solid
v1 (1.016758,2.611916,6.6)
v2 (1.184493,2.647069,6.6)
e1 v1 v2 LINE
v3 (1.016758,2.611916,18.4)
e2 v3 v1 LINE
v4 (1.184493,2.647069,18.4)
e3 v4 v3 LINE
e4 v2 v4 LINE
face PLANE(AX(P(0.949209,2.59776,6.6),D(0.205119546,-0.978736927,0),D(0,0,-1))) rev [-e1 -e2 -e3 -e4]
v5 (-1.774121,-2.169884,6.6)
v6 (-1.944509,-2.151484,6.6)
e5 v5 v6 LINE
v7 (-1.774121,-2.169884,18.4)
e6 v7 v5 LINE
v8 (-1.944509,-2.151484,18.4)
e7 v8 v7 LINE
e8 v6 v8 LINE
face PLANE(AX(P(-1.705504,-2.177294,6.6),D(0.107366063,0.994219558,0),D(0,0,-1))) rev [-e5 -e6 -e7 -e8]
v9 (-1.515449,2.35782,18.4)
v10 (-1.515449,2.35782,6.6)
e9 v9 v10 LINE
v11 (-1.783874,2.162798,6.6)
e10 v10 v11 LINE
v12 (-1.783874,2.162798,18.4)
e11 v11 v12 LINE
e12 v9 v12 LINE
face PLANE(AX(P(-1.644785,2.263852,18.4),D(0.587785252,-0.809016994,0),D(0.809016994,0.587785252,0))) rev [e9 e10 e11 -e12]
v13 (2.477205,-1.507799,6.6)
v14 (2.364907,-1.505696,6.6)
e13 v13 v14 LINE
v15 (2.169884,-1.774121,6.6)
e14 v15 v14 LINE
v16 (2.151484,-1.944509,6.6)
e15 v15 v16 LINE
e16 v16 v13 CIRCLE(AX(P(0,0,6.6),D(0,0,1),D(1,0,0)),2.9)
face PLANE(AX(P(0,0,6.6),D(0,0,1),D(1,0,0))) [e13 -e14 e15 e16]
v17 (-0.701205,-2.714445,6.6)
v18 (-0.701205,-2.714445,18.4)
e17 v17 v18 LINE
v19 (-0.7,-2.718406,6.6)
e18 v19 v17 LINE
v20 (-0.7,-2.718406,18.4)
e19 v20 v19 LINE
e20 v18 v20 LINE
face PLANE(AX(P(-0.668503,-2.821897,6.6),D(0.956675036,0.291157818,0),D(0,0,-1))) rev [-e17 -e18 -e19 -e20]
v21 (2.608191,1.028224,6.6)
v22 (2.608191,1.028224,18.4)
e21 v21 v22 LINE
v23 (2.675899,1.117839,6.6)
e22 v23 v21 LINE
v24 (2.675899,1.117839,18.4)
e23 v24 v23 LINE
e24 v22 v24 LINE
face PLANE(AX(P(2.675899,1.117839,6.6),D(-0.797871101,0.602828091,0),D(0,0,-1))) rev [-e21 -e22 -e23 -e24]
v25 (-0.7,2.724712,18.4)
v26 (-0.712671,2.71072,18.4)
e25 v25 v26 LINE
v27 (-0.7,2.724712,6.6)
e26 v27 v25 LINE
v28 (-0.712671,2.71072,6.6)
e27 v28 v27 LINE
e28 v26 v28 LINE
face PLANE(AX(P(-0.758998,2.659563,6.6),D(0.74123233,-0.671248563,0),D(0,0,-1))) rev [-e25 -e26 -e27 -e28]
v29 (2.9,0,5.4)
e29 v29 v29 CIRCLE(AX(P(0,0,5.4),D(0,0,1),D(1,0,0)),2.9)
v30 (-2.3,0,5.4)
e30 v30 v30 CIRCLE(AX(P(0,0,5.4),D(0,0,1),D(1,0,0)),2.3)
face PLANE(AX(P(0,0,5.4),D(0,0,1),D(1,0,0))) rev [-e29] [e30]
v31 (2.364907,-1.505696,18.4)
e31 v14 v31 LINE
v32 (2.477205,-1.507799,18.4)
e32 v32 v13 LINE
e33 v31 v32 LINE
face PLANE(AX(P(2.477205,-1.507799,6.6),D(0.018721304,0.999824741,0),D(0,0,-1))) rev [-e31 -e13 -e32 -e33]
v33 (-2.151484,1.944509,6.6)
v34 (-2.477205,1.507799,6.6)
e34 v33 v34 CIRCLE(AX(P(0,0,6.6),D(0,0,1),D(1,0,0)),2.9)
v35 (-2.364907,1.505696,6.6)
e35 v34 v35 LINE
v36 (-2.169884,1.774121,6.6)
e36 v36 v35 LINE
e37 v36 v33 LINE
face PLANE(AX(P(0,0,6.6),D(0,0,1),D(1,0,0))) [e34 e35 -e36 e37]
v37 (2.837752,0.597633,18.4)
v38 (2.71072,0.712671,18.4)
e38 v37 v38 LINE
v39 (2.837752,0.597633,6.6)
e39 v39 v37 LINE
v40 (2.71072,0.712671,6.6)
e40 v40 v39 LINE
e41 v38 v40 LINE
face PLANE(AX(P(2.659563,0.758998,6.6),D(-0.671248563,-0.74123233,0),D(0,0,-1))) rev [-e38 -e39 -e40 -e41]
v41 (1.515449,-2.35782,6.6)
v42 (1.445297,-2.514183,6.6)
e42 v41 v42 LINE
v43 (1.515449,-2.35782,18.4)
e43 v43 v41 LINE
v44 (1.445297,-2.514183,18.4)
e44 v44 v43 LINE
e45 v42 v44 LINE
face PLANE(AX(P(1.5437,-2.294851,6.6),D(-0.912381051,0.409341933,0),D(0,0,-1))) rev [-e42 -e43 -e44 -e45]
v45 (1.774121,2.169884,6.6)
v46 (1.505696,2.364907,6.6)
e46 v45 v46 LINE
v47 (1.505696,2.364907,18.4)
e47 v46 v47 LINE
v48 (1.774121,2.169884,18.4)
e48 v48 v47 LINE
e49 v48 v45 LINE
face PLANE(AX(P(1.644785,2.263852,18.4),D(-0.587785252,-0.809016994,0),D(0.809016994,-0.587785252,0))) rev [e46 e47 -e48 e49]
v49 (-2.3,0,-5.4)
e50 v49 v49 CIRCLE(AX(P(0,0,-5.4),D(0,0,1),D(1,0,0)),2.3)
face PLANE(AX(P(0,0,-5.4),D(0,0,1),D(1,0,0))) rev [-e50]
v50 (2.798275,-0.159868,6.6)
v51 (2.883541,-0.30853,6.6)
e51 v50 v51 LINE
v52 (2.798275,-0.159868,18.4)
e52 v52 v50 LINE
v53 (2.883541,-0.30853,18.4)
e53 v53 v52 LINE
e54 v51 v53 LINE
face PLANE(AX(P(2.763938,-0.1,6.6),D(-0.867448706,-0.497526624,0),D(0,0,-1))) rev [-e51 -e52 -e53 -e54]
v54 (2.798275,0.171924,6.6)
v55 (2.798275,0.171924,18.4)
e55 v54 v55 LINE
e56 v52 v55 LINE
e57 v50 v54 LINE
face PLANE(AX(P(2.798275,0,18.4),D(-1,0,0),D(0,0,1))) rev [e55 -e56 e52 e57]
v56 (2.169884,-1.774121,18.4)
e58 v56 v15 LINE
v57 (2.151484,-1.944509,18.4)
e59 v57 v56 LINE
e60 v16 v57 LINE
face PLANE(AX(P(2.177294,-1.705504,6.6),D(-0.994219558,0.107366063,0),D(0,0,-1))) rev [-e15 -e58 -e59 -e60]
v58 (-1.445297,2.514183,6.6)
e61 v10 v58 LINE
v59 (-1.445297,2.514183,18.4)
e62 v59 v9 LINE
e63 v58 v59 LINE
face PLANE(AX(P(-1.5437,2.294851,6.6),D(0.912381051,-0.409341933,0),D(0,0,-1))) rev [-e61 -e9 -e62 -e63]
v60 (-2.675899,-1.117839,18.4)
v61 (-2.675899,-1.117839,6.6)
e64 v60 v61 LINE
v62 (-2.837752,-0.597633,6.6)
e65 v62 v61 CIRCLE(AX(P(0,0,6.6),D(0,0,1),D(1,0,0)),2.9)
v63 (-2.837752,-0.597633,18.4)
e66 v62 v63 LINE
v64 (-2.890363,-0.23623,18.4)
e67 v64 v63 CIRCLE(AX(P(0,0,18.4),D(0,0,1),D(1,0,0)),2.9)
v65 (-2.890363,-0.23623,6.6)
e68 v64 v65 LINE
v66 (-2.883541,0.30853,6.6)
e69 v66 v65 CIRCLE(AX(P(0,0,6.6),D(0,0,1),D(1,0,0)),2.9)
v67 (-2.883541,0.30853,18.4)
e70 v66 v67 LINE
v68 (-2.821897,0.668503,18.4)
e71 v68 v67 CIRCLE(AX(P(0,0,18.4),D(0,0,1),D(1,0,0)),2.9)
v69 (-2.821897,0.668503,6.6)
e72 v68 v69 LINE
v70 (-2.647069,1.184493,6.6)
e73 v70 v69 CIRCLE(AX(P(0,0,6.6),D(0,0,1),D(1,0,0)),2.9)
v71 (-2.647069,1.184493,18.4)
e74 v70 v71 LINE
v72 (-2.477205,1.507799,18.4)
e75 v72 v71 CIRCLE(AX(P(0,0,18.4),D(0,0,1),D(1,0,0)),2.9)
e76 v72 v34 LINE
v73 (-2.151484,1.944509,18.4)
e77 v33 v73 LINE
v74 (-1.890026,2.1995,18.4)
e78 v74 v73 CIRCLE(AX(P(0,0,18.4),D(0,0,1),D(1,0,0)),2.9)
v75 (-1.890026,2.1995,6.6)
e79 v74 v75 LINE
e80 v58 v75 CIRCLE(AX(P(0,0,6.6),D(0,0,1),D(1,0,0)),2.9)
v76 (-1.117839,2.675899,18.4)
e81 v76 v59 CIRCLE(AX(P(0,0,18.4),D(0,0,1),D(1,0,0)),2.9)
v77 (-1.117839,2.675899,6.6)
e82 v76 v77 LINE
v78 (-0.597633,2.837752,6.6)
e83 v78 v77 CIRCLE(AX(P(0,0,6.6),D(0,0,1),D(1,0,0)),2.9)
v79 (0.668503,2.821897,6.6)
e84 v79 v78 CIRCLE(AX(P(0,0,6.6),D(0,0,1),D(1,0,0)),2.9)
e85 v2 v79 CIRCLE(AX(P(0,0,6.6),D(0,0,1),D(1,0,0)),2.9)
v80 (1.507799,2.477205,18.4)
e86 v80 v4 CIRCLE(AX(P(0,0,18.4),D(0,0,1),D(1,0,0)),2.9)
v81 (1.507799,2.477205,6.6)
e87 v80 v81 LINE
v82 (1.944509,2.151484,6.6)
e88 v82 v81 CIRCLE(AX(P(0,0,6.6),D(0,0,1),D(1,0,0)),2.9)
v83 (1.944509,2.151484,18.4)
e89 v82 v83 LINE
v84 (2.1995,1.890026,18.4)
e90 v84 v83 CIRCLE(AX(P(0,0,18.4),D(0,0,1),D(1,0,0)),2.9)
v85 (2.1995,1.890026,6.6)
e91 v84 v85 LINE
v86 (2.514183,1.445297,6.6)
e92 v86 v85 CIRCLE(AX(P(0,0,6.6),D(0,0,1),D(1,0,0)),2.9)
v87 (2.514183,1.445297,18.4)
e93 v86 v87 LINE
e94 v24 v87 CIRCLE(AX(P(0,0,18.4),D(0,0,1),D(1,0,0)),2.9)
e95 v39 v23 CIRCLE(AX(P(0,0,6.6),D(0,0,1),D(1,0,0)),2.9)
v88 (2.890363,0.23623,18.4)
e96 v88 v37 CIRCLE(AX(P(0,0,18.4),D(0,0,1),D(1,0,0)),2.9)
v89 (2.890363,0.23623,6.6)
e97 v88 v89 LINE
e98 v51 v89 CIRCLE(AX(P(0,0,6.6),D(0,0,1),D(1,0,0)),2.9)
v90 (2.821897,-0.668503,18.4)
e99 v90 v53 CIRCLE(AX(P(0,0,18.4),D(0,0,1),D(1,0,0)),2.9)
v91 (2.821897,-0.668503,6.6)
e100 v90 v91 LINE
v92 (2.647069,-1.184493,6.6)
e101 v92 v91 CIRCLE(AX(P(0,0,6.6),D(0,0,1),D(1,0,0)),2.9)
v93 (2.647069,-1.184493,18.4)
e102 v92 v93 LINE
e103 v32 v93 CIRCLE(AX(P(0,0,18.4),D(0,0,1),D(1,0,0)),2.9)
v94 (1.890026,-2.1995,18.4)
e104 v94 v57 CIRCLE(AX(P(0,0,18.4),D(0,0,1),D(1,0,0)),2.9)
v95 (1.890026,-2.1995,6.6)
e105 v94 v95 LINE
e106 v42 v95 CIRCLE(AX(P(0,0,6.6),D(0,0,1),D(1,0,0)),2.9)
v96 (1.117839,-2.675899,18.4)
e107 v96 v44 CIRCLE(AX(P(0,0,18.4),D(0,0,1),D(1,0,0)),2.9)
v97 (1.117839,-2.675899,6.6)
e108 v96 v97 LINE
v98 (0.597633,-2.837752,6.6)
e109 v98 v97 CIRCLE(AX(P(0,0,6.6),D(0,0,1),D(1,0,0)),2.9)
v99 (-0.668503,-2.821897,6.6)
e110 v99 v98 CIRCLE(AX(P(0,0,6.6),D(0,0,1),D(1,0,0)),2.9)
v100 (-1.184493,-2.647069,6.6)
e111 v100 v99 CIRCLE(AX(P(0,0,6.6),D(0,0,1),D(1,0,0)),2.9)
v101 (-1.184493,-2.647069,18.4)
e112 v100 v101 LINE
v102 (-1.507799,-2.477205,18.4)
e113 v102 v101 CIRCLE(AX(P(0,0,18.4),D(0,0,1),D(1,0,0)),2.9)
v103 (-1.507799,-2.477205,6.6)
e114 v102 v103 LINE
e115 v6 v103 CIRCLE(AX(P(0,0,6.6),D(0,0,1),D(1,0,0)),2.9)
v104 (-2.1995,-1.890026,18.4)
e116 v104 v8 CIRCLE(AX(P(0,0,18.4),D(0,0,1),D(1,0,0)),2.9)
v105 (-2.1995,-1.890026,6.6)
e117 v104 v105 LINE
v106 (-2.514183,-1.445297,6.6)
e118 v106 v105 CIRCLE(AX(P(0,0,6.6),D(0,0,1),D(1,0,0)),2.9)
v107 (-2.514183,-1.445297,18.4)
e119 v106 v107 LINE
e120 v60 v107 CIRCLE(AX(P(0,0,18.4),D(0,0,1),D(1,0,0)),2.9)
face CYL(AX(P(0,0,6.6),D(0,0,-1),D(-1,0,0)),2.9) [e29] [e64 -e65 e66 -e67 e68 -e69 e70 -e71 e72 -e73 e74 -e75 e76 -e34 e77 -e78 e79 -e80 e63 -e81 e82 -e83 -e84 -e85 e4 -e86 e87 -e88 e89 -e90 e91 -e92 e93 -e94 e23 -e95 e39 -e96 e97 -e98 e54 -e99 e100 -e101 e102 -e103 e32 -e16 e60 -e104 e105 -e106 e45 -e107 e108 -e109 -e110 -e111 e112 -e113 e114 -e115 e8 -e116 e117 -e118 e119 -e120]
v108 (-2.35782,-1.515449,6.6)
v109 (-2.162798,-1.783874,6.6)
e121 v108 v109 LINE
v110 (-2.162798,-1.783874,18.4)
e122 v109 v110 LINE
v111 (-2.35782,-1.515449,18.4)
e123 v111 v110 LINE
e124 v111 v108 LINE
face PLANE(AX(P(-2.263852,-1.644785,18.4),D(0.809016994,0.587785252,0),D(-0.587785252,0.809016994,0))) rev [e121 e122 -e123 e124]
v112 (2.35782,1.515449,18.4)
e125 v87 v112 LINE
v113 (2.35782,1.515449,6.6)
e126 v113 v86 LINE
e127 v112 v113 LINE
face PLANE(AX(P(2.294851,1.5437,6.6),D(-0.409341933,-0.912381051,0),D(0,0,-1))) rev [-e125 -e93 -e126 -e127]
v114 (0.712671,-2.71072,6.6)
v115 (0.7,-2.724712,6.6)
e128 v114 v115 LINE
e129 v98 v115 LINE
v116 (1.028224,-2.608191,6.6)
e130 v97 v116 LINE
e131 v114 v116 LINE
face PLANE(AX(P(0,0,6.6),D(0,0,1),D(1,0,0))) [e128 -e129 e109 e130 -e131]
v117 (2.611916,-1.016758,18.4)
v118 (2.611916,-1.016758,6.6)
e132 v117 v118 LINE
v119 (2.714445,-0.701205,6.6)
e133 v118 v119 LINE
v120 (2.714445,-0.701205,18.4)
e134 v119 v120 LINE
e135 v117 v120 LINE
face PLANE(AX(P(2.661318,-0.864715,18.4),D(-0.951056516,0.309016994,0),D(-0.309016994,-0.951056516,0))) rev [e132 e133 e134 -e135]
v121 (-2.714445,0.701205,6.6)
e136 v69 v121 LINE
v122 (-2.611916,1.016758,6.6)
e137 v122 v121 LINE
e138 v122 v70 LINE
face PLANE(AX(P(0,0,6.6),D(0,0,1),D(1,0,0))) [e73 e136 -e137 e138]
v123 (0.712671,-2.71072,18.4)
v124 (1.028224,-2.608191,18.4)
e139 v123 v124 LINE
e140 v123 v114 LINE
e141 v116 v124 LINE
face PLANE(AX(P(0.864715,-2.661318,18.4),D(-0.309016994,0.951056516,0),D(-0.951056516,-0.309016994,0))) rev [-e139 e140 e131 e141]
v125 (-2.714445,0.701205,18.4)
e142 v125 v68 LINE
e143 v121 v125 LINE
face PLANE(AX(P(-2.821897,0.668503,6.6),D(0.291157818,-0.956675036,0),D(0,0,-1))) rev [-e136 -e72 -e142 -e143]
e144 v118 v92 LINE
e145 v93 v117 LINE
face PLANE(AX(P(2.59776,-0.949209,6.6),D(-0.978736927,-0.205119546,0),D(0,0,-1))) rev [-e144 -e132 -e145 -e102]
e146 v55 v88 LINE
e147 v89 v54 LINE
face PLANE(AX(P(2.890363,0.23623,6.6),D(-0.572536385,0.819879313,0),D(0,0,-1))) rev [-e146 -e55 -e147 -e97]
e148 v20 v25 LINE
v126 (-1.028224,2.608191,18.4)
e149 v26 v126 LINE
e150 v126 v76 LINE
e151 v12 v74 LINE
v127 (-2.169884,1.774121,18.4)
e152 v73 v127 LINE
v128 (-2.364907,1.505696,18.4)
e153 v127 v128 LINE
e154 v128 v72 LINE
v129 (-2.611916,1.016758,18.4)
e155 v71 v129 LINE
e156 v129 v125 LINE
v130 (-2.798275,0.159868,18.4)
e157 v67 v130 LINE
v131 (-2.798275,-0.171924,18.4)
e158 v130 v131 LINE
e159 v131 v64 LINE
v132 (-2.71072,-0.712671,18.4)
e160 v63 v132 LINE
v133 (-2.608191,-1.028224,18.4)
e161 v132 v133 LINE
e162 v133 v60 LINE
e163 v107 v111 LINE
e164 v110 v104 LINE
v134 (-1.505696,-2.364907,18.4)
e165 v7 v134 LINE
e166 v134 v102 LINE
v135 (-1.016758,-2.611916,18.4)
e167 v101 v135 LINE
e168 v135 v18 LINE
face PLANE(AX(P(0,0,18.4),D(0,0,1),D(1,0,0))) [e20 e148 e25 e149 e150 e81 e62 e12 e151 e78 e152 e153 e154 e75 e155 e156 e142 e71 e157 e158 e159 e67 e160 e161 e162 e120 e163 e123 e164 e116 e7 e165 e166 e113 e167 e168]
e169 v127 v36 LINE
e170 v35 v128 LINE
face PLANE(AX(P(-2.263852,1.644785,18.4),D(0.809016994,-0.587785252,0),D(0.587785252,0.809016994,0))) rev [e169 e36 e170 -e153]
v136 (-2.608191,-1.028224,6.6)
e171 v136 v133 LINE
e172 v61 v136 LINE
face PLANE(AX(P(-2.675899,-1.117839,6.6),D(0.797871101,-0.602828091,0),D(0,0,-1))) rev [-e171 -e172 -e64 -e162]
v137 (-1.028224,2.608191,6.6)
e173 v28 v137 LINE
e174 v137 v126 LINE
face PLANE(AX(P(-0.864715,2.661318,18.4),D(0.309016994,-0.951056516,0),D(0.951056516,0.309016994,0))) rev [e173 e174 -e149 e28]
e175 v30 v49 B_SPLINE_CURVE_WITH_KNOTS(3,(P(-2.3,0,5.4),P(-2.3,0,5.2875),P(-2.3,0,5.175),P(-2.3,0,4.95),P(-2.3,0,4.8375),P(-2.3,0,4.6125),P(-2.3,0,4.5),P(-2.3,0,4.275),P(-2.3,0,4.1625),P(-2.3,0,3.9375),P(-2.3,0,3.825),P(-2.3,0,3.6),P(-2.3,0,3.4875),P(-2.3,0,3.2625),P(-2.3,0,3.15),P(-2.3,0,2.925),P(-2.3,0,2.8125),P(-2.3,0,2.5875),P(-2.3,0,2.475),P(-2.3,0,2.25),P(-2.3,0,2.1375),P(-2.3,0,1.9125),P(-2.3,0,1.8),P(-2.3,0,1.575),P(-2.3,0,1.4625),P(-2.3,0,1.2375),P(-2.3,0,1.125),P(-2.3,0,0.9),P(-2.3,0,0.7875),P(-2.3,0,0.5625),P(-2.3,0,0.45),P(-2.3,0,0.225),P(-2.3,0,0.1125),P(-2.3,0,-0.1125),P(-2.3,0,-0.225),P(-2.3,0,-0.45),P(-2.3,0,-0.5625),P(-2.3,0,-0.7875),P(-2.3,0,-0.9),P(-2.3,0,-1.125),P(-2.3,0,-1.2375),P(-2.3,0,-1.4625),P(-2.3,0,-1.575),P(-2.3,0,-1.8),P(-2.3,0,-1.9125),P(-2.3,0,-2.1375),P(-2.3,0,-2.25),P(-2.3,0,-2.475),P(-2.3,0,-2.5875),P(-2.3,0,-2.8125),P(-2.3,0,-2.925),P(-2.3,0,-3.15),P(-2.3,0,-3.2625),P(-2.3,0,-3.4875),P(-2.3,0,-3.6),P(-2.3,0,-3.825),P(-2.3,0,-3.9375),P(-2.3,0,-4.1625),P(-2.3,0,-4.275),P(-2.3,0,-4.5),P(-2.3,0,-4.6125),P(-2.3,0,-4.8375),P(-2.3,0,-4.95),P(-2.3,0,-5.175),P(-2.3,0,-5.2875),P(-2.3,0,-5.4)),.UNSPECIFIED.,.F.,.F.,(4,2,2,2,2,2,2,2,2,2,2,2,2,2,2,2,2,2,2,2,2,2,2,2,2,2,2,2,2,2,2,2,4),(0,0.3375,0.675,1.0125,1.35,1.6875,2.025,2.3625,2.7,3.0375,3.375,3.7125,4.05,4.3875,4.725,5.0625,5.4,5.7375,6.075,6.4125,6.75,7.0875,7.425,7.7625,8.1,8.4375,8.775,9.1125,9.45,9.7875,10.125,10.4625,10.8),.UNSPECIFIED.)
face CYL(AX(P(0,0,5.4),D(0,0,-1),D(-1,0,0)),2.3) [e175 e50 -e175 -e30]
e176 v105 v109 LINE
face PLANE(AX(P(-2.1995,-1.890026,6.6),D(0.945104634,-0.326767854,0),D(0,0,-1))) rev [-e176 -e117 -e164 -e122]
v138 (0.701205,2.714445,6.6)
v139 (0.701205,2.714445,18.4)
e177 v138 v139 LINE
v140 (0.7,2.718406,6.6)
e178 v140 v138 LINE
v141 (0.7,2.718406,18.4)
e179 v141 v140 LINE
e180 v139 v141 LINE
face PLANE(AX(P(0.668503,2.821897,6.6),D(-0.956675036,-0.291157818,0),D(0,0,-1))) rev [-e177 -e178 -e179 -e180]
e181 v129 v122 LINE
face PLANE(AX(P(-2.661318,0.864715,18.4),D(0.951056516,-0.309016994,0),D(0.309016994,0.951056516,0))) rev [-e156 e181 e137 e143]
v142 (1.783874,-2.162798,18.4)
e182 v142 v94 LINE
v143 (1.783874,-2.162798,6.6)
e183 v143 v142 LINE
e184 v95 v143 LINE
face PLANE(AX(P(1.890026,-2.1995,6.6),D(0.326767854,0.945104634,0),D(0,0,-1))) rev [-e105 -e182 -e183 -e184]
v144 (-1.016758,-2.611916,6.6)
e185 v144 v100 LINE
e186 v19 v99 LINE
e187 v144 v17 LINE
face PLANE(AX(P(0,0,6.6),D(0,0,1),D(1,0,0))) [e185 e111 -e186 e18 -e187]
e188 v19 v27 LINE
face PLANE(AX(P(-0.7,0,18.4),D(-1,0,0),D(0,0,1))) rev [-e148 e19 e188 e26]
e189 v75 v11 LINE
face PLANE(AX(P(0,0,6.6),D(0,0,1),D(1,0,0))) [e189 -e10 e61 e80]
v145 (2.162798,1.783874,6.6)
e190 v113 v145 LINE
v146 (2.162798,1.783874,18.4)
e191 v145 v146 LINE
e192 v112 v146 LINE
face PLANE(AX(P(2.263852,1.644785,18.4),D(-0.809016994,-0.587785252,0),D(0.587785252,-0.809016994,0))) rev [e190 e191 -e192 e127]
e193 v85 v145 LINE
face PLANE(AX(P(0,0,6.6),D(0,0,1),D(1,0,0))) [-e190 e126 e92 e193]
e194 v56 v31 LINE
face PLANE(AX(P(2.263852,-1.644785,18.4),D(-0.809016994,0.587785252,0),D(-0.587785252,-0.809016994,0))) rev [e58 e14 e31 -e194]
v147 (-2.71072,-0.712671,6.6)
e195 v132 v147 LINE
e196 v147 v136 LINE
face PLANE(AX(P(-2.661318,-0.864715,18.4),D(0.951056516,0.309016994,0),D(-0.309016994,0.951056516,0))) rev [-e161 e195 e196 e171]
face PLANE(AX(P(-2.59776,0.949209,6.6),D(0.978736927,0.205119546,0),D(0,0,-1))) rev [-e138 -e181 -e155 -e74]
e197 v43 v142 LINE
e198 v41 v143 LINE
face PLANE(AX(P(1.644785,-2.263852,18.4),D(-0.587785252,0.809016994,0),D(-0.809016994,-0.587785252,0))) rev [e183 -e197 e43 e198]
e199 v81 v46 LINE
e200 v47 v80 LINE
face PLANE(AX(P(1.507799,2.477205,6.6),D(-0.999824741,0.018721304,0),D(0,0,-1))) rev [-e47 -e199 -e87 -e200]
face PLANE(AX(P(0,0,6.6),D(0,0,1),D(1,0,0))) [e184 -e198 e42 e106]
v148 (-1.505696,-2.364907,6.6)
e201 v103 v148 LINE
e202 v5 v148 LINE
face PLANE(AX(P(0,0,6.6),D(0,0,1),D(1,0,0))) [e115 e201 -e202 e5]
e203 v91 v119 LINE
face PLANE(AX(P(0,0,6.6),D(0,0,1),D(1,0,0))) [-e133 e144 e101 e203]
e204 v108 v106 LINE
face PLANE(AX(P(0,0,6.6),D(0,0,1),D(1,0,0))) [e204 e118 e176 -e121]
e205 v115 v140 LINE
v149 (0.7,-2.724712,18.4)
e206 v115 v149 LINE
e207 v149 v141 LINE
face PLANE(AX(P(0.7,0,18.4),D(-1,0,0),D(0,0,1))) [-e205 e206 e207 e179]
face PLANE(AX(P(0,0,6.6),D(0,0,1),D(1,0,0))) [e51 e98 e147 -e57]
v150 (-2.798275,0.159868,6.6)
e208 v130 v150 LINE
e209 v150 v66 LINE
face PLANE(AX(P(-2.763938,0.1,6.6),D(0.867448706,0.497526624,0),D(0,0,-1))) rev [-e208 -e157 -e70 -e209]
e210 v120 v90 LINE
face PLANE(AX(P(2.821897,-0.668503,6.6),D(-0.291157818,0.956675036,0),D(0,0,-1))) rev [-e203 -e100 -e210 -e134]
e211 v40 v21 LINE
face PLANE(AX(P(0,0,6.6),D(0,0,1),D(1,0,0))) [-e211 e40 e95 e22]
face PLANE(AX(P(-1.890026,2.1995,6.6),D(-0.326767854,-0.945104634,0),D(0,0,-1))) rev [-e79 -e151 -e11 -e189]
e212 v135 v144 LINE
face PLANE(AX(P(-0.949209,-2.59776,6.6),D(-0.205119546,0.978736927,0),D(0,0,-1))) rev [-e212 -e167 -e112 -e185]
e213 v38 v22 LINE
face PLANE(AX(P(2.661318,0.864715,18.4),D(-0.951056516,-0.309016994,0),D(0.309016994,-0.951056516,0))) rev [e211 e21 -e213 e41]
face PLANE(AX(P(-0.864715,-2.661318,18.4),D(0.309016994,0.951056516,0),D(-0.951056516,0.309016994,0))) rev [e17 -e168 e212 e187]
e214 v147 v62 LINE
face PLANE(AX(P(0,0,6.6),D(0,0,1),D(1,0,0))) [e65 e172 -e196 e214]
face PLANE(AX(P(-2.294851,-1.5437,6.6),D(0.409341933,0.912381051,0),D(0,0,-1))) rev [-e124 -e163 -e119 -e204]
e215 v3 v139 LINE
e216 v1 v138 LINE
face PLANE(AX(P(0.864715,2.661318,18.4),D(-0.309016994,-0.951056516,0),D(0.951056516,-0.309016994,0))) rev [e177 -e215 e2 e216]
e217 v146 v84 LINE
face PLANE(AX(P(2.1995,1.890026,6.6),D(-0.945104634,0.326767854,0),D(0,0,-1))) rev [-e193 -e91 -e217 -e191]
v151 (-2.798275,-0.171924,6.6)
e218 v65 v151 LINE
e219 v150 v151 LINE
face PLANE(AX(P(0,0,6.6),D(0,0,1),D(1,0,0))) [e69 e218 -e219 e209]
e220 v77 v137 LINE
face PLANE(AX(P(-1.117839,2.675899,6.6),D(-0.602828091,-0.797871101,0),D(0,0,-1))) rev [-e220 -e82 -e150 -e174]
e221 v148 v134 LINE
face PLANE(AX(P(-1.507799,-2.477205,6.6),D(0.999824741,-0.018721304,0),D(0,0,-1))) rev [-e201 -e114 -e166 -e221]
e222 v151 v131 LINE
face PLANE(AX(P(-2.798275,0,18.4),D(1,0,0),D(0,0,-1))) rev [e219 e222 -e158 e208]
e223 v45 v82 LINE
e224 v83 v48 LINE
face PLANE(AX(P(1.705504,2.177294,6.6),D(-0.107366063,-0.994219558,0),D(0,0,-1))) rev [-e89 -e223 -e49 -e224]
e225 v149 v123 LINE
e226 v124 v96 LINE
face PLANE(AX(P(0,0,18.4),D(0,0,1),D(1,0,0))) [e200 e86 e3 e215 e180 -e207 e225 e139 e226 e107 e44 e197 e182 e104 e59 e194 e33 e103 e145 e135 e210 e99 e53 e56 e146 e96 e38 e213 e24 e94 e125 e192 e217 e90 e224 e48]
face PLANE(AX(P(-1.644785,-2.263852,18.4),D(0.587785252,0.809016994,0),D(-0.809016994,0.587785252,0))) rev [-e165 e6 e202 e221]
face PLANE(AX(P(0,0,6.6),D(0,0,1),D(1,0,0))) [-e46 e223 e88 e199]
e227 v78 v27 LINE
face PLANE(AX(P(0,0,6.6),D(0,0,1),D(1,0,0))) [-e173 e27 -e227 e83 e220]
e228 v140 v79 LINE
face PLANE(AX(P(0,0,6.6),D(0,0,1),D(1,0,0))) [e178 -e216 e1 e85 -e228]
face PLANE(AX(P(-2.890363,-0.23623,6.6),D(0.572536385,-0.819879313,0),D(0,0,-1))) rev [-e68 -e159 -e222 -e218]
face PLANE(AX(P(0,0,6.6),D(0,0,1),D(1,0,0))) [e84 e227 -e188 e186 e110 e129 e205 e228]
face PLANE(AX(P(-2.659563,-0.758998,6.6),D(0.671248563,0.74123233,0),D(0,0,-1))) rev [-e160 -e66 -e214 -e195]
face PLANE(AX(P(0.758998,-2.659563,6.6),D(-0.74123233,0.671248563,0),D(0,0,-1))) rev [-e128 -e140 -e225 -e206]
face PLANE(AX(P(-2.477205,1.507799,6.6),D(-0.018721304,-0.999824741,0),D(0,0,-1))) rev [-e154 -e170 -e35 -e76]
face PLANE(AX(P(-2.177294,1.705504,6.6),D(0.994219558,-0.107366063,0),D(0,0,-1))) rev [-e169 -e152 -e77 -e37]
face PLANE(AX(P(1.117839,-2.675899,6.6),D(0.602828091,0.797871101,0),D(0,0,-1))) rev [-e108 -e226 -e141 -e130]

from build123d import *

# Parameters (mm, degrees)
SKETCH1_R           = 2.3
BOSS_EXTRUDE1_DEPTH = 5.4
BOSS_EXTRUDE2_START = 5.4
SKETCH2_R           = 2.9
BOSS_EXTRUDE2_DEPTH = 1.2
BOSS_EXTRUDE3_START = 6.6
BOSS_EXTRUDE3_DEPTH = 11.8
CHAMFER1_START      = 6.6
CHAMFER1_DEPTH      = 11.8


with BuildPart() as part:
    # Sketch1 → Boss-Extrude1 (new, symmetric)
    with BuildSketch(Plane.XY):
        with Locations(Location((0, 0, 0), (0, 0, 180))):
            Circle(SKETCH1_R)
    extrude(amount=BOSS_EXTRUDE1_DEPTH, both=True)

    # Sketch2 → Boss-Extrude2 (add)
    with BuildSketch(Plane.XY.offset(BOSS_EXTRUDE2_START)):
        Circle(SKETCH2_R)
    extrude(amount=BOSS_EXTRUDE2_DEPTH)

    # Sketch3 → Boss-Extrude3 (add)
    with BuildSketch(Plane.XY.offset(BOSS_EXTRUDE3_START)):
        with BuildLine():
            ThreePointArc((0.800510686, 2.787325356), (0.75037611, 2.801238243), (0.7, 2.814249456))
            Line((0.7, 2.814249456), (0.7, -2.814249456))
            ThreePointArc((0.7, -2.814249456), (0.75037611, -2.801238243), (0.800510686, -2.787325356))
            Line((0.800510686, -2.787325356), (0.769608986, -2.692219705))
            Line((0.769608986, -2.692219705), (0.864714638, -2.661318005))
            Line((0.864714638, -2.661318005), (0.959820289, -2.630416306))
            Line((0.959820289, -2.630416306), (0.990721989, -2.725521957))
            ThreePointArc((0.990721989, -2.725521957), (1.316572449, -2.58391892), (1.622661808, -2.403532537))
            Line((1.622661808, -2.403532537), (1.563883283, -2.322630838))
            Line((1.563883283, -2.322630838), (1.644784982, -2.263852312))
            Line((1.644784982, -2.263852312), (1.725686682, -2.205073787))
            Line((1.725686682, -2.205073787), (1.784465207, -2.285975487))
            ThreePointArc((1.784465207, -2.285975487), (2.050609665, -2.050609665), (2.285975487, -1.784465207))
            Line((2.285975487, -1.784465207), (2.205073787, -1.725686682))
            Line((2.205073787, -1.725686682), (2.263852312, -1.644784982))
            Line((2.263852312, -1.644784982), (2.322630838, -1.563883283))
            Line((2.322630838, -1.563883283), (2.403532537, -1.622661808))
            ThreePointArc((2.403532537, -1.622661808), (2.58391892, -1.316572449), (2.725521957, -0.990721989))
            Line((2.725521957, -0.990721989), (2.630416306, -0.959820289))
            Line((2.630416306, -0.959820289), (2.661318005, -0.864714638))
            Line((2.661318005, -0.864714638), (2.692219705, -0.769608986))
            Line((2.692219705, -0.769608986), (2.787325356, -0.800510686))
            ThreePointArc((2.787325356, -0.800510686), (2.864296188, -0.453659949), (2.898275349, -0.1))
            Line((2.898275349, -0.1), (2.798275349, -0.1))
            Line((2.798275349, -0.1), (2.798275349, 0))
            Line((2.798275349, 0), (2.798275349, 0.1))
            Line((2.798275349, 0.1), (2.898275349, 0.1))
            ThreePointArc((2.898275349, 0.1), (2.864296188, 0.453659949), (2.787325356, 0.800510686))
            Line((2.787325356, 0.800510686), (2.692219705, 0.769608986))
            Line((2.692219705, 0.769608986), (2.661318005, 0.864714638))
            Line((2.661318005, 0.864714638), (2.630416306, 0.959820289))
            Line((2.630416306, 0.959820289), (2.725521957, 0.990721989))
            ThreePointArc((2.725521957, 0.990721989), (2.58391892, 1.316572449), (2.403532537, 1.622661808))
            Line((2.403532537, 1.622661808), (2.322630838, 1.563883283))
            Line((2.322630838, 1.563883283), (2.263852312, 1.644784982))
            Line((2.263852312, 1.644784982), (2.205073787, 1.725686682))
            Line((2.205073787, 1.725686682), (2.285975487, 1.784465207))
            ThreePointArc((2.285975487, 1.784465207), (2.050609665, 2.050609665), (1.784465207, 2.285975487))
            Line((1.784465207, 2.285975487), (1.725686682, 2.205073787))
            Line((1.725686682, 2.205073787), (1.644784982, 2.263852312))
            Line((1.644784982, 2.263852312), (1.563883283, 2.322630838))
            Line((1.563883283, 2.322630838), (1.622661808, 2.403532537))
            ThreePointArc((1.622661808, 2.403532537), (1.316572449, 2.58391892), (0.990721989, 2.725521957))
            Line((0.990721989, 2.725521957), (0.959820289, 2.630416306))
            Line((0.959820289, 2.630416306), (0.864714638, 2.661318005))
            Line((0.864714638, 2.661318005), (0.769608986, 2.692219705))
            Line((0.769608986, 2.692219705), (0.800510686, 2.787325356))
        make_face()
        with BuildLine():
            Line((-2.798275349, 0), (-0.7, 0))
            Line((-0.7, 0), (-0.7, 2.814249456))
            ThreePointArc((-0.7, 2.814249456), (-0.75037611, 2.801238243), (-0.800510686, 2.787325356))
            Line((-0.800510686, 2.787325356), (-0.769608986, 2.692219705))
            Line((-0.769608986, 2.692219705), (-0.864714638, 2.661318005))
            Line((-0.864714638, 2.661318005), (-0.959820289, 2.630416306))
            Line((-0.959820289, 2.630416306), (-0.990721989, 2.725521957))
            ThreePointArc((-0.990721989, 2.725521957), (-1.316572449, 2.58391892), (-1.622661808, 2.403532537))
            Line((-1.622661808, 2.403532537), (-1.563883283, 2.322630838))
            Line((-1.563883283, 2.322630838), (-1.644784982, 2.263852312))
            Line((-1.644784982, 2.263852312), (-1.725686682, 2.205073787))
            Line((-1.725686682, 2.205073787), (-1.784465207, 2.285975487))
            ThreePointArc((-1.784465207, 2.285975487), (-2.050609665, 2.050609665), (-2.285975487, 1.784465207))
            Line((-2.285975487, 1.784465207), (-2.205073787, 1.725686682))
            Line((-2.205073787, 1.725686682), (-2.263852312, 1.644784982))
            Line((-2.263852312, 1.644784982), (-2.322630838, 1.563883283))
            Line((-2.322630838, 1.563883283), (-2.403532537, 1.622661808))
            ThreePointArc((-2.403532537, 1.622661808), (-2.58391892, 1.316572449), (-2.725521957, 0.990721989))
            Line((-2.725521957, 0.990721989), (-2.630416306, 0.959820289))
            Line((-2.630416306, 0.959820289), (-2.661318005, 0.864714638))
            Line((-2.661318005, 0.864714638), (-2.692219705, 0.769608986))
            Line((-2.692219705, 0.769608986), (-2.787325356, 0.800510686))
            ThreePointArc((-2.787325356, 0.800510686), (-2.864296188, 0.453659949), (-2.898275349, 0.1))
            Line((-2.898275349, 0.1), (-2.798275349, 0.1))
            Line((-2.798275349, 0.1), (-2.798275349, 0))
        make_face()
        with BuildLine():
            Line((-0.7, -2.814249456), (-0.7, 0))
            Line((-0.7, 0), (-2.798275349, 0))
            Line((-2.798275349, 0), (-2.798275349, -0.1))
            Line((-2.798275349, -0.1), (-2.898275349, -0.1))
            ThreePointArc((-2.898275349, -0.1), (-2.864296188, -0.453659949), (-2.787325356, -0.800510686))
            Line((-2.787325356, -0.800510686), (-2.692219705, -0.769608986))
            Line((-2.692219705, -0.769608986), (-2.661318005, -0.864714638))
            Line((-2.661318005, -0.864714638), (-2.630416306, -0.959820289))
            Line((-2.630416306, -0.959820289), (-2.725521957, -0.990721989))
            ThreePointArc((-2.725521957, -0.990721989), (-2.58391892, -1.316572449), (-2.403532537, -1.622661808))
            Line((-2.403532537, -1.622661808), (-2.322630838, -1.563883283))
            Line((-2.322630838, -1.563883283), (-2.263852312, -1.644784982))
            Line((-2.263852312, -1.644784982), (-2.205073787, -1.725686682))
            Line((-2.205073787, -1.725686682), (-2.285975487, -1.784465207))
            ThreePointArc((-2.285975487, -1.784465207), (-2.050609665, -2.050609665), (-1.784465207, -2.285975487))
            Line((-1.784465207, -2.285975487), (-1.725686682, -2.205073787))
            Line((-1.725686682, -2.205073787), (-1.644784982, -2.263852312))
            Line((-1.644784982, -2.263852312), (-1.563883283, -2.322630838))
            Line((-1.563883283, -2.322630838), (-1.622661808, -2.403532537))
            ThreePointArc((-1.622661808, -2.403532537), (-1.316572449, -2.58391892), (-0.990721989, -2.725521957))
            Line((-0.990721989, -2.725521957), (-0.959820289, -2.630416306))
            Line((-0.959820289, -2.630416306), (-0.864714638, -2.661318005))
            Line((-0.864714638, -2.661318005), (-0.769608986, -2.692219705))
            Line((-0.769608986, -2.692219705), (-0.800510686, -2.787325356))
            ThreePointArc((-0.800510686, -2.787325356), (-0.75037611, -2.801238243), (-0.7, -2.814249456))
        make_face()
    extrude(amount=BOSS_EXTRUDE3_DEPTH)

    # Chamfer1: read off the stored shape, not the designer's step
    # Chamfer1 outline → Chamfer1 (cut)
    with BuildSketch(Plane.XY.offset(CHAMFER1_START)):
        with BuildLine():
            Line((2.890362517, 0.236229809), (2.798275349, 0.171923694))
            Line((2.798275349, 0.171923694), (2.798275349, 0.1))
            Line((2.798275349, 0.1), (2.898275349, 0.1))
            ThreePointArc((2.898275349, 0.1), (2.89512033, 0.168161453), (2.890362517, 0.236229809))
        make_face()
        with BuildLine():
            Line((2.898275349, -0.1), (2.798275349, -0.1))
            Line((2.798275349, -0.1), (2.798275349, -0.159867812))
            Line((2.798275349, -0.159867812), (2.883541046, -0.308530446))
            ThreePointArc((2.883541046, -0.308530446), (2.892787832, -0.204398034), (2.898275349, -0.1))
        make_face()
        with BuildLine():
            Line((2.710719876, 0.712671314), (2.837751653, 0.597633297))
            ThreePointArc((2.837751653, 0.597633297), (2.814367184, 0.69952652), (2.787325356, 0.800510686))
            Line((2.787325356, 0.800510686), (2.692219705, 0.769608986))
            Line((2.692219705, 0.769608986), (2.710719876, 0.712671314))
        make_face()
        with BuildLine():
            Line((2.630416306, 0.959820289), (2.725521957, 0.990721989))
            ThreePointArc((2.725521957, 0.990721989), (2.701458308, 1.054572429), (2.67589908, 1.117839037))
            Line((2.67589908, 1.117839037), (2.608190662, 1.028223787))
            Line((2.608190662, 1.028223787), (2.630416306, 0.959820289))
        make_face()
        with BuildLine():
            ThreePointArc((2.787325356, -0.800510686), (2.805387802, -0.734710337), (2.821897132, -0.668503238))
            Line((2.821897132, -0.668503238), (2.714445348, -0.701205489))
            Line((2.714445348, -0.701205489), (2.692219705, -0.769608986))
            Line((2.692219705, -0.769608986), (2.787325356, -0.800510686))
        make_face()
        with BuildLine():
            Line((2.357820254, 1.515449206), (2.514183356, 1.445296528))
            ThreePointArc((2.514183356, 1.445296528), (2.460456667, 1.534976543), (2.403532537, 1.622661808))
            Line((2.403532537, 1.622661808), (2.322630838, 1.563883283))
            Line((2.322630838, 1.563883283), (2.357820254, 1.515449206))
        make_face()
        with BuildLine():
            ThreePointArc((2.647069351, -1.184493078), (2.688042252, -1.088314683), (2.725521957, -0.990721989))
            Line((2.725521957, -0.990721989), (2.630416306, -0.959820289))
            Line((2.630416306, -0.959820289), (2.611916135, -1.016757962))
            Line((2.611916135, -1.016757962), (2.647069351, -1.184493078))
        make_face()
        with BuildLine():
            Line((2.205073787, 1.725686682), (2.285975487, 1.784465207))
            ThreePointArc((2.285975487, 1.784465207), (2.243358726, 1.837754507), (2.199499998, 1.890026391))
            Line((2.199499998, 1.890026391), (2.162798101, 1.783874172))
            Line((2.162798101, 1.783874172), (2.205073787, 1.725686682))
        make_face()
        with BuildLine():
            ThreePointArc((2.403532537, -1.622661808), (2.44104437, -1.56566356), (2.477204794, -1.507798531))
            Line((2.477204794, -1.507798531), (2.364906524, -1.505695792))
            Line((2.364906524, -1.505695792), (2.322630837, -1.563883283))
            Line((2.322630837, -1.563883283), (2.403532537, -1.622661808))
        make_face()
        with BuildLine():
            Line((1.774120759, 2.16988437), (1.944509275, 2.151484064))
            ThreePointArc((1.944509275, 2.151484064), (1.865699509, 2.220172368), (1.784465207, 2.285975487))
            Line((1.784465207, 2.285975487), (1.725686682, 2.205073787))
            Line((1.725686682, 2.205073787), (1.774120759, 2.16988437))
        make_face()
        with BuildLine():
            ThreePointArc((2.151484064, -1.944509275), (2.220172368, -1.865699509), (2.285975487, -1.784465207))
            Line((2.285975487, -1.784465207), (2.205073787, -1.725686682))
            Line((2.205073787, -1.725686682), (2.16988437, -1.774120759))
            Line((2.16988437, -1.774120759), (2.151484064, -1.944509275))
        make_face()
        with BuildLine():
            Line((1.563883283, 2.322630838), (1.622661808, 2.403532537))
            ThreePointArc((1.622661808, 2.403532537), (1.56566356, 2.44104437), (1.507798531, 2.477204794))
            Line((1.507798531, 2.477204794), (1.505695792, 2.364906524))
            Line((1.505695792, 2.364906524), (1.563883283, 2.322630838))
        make_face()
        with BuildLine():
            ThreePointArc((1.784465207, -2.285975487), (1.837754507, -2.243358726), (1.890026391, -2.199499998))
            Line((1.890026391, -2.199499998), (1.783874172, -2.162798101))
            Line((1.783874172, -2.162798101), (1.725686682, -2.205073787))
            Line((1.725686682, -2.205073787), (1.784465207, -2.285975487))
        make_face()
        with BuildLine():
            Line((1.016757962, 2.611916135), (1.184493078, 2.647069351))
            ThreePointArc((1.184493078, 2.647069351), (1.088314683, 2.688042252), (0.990721989, 2.725521957))
            Line((0.990721989, 2.725521957), (0.959820289, 2.630416306))
            Line((0.959820289, 2.630416306), (1.016757962, 2.611916135))
        make_face()
        with BuildLine():
            ThreePointArc((1.445296528, -2.514183356), (1.534976543, -2.460456667), (1.622661808, -2.403532537))
            Line((1.622661808, -2.403532537), (1.563883283, -2.322630838))
            Line((1.563883283, -2.322630838), (1.515449206, -2.357820254))
            Line((1.515449206, -2.357820254), (1.445296528, -2.514183356))
        make_face()
        with BuildLine():
            Line((0.769608986, 2.692219705), (0.800510686, 2.787325356))
            ThreePointArc((0.800510686, 2.787325356), (0.75037611, 2.801238243), (0.7, 2.814249456))
            Line((0.7, 2.814249456), (0.7, 2.718406296))
            Line((0.7, 2.718406296), (0.701205489, 2.714445348))
            Line((0.701205489, 2.714445348), (0.769608986, 2.692219705))
        make_face()
        with BuildLine():
            ThreePointArc((0.990721989, -2.725521957), (1.054572429, -2.701458308), (1.117839037, -2.67589908))
            Line((1.117839037, -2.67589908), (1.028223787, -2.608190662))
            Line((1.028223787, -2.608190662), (0.959820289, -2.630416306))
            Line((0.959820289, -2.630416306), (0.990721989, -2.725521957))
        make_face()
        with BuildLine():
            Line((-0.7, 2.72471229), (-0.7, 2.814249456))
            ThreePointArc((-0.7, 2.814249456), (-0.75037611, 2.801238243), (-0.800510686, 2.787325356))
            Line((-0.800510686, 2.787325356), (-0.769608986, 2.692219705))
            Line((-0.769608986, 2.692219705), (-0.712671314, 2.710719876))
            Line((-0.712671314, 2.710719876), (-0.7, 2.72471229))
        make_face()
        with BuildLine():
            ThreePointArc((0.7, -2.814249456), (0.75037611, -2.801238243), (0.800510686, -2.787325356))
            Line((0.800510686, -2.787325356), (0.769608986, -2.692219705))
            Line((0.769608986, -2.692219705), (0.712671314, -2.710719876))
            Line((0.712671314, -2.710719876), (0.7, -2.72471229))
            Line((0.7, -2.72471229), (0.7, -2.814249456))
        make_face()
        with BuildLine():
            Line((-0.959820289, 2.630416306), (-0.990721989, 2.725521957))
            ThreePointArc((-0.990721989, 2.725521957), (-1.054572429, 2.701458308), (-1.117839037, 2.67589908))
            Line((-1.117839037, 2.67589908), (-1.028223787, 2.608190662))
            Line((-1.028223787, 2.608190662), (-0.959820289, 2.630416306))
        make_face()
        with BuildLine():
            Line((-0.7, -2.814249456), (-0.7, -2.718406296))
            Line((-0.7, -2.718406296), (-0.701205489, -2.714445348))
            Line((-0.701205489, -2.714445348), (-0.769608986, -2.692219705))
            Line((-0.769608986, -2.692219705), (-0.800510686, -2.787325356))
            ThreePointArc((-0.800510686, -2.787325356), (-0.75037611, -2.801238243), (-0.7, -2.814249456))
        make_face()
        with BuildLine():
            Line((-1.515449206, 2.357820254), (-1.445296528, 2.514183356))
            ThreePointArc((-1.445296528, 2.514183356), (-1.534976543, 2.460456667), (-1.622661808, 2.403532537))
            Line((-1.622661808, 2.403532537), (-1.563883283, 2.322630838))
            Line((-1.563883283, 2.322630838), (-1.515449206, 2.357820254))
        make_face()
        with BuildLine():
            ThreePointArc((-1.184493078, -2.647069351), (-1.088314683, -2.688042252), (-0.990721989, -2.725521957))
            Line((-0.990721989, -2.725521957), (-0.959820289, -2.630416306))
            Line((-0.959820289, -2.630416306), (-1.016757962, -2.611916135))
            Line((-1.016757962, -2.611916135), (-1.184493078, -2.647069351))
        make_face()
        with BuildLine():
            Line((-1.725686682, 2.205073787), (-1.784465207, 2.285975487))
            ThreePointArc((-1.784465207, 2.285975487), (-1.837754507, 2.243358726), (-1.890026391, 2.199499998))
            Line((-1.890026391, 2.199499998), (-1.783874172, 2.162798101))
            Line((-1.783874172, 2.162798101), (-1.725686682, 2.205073787))
        make_face()
        with BuildLine():
            ThreePointArc((-1.622661808, -2.403532537), (-1.56566356, -2.44104437), (-1.507798531, -2.477204794))
            Line((-1.507798531, -2.477204794), (-1.505695792, -2.364906524))
            Line((-1.505695792, -2.364906524), (-1.563883283, -2.322630837))
            Line((-1.563883283, -2.322630837), (-1.622661808, -2.403532537))
        make_face()
        with BuildLine():
            Line((-2.16988437, 1.774120759), (-2.151484064, 1.944509275))
            ThreePointArc((-2.151484064, 1.944509275), (-2.220172368, 1.865699509), (-2.285975487, 1.784465207))
            Line((-2.285975487, 1.784465207), (-2.205073787, 1.725686682))
            Line((-2.205073787, 1.725686682), (-2.16988437, 1.774120759))
        make_face()
        with BuildLine():
            ThreePointArc((-1.944509275, -2.151484064), (-1.865699509, -2.220172368), (-1.784465207, -2.285975487))
            Line((-1.784465207, -2.285975487), (-1.725686682, -2.205073787))
            Line((-1.725686682, -2.205073787), (-1.774120759, -2.16988437))
            Line((-1.774120759, -2.16988437), (-1.944509275, -2.151484064))
        make_face()
        with BuildLine():
            Line((-2.322630838, 1.563883283), (-2.403532537, 1.622661808))
            ThreePointArc((-2.403532537, 1.622661808), (-2.44104437, 1.56566356), (-2.477204794, 1.507798531))
            Line((-2.477204794, 1.507798531), (-2.364906524, 1.505695792))
            Line((-2.364906524, 1.505695792), (-2.322630838, 1.563883283))
        make_face()
        with BuildLine():
            ThreePointArc((-2.285975487, -1.784465207), (-2.243358726, -1.837754507), (-2.199499998, -1.890026391))
            Line((-2.199499998, -1.890026391), (-2.162798101, -1.783874172))
            Line((-2.162798101, -1.783874172), (-2.205073787, -1.725686682))
            Line((-2.205073787, -1.725686682), (-2.285975487, -1.784465207))
        make_face()
        with BuildLine():
            Line((-2.611916135, 1.016757962), (-2.647069351, 1.184493078))
            ThreePointArc((-2.647069351, 1.184493078), (-2.688042252, 1.088314683), (-2.725521957, 0.990721989))
            Line((-2.725521957, 0.990721989), (-2.630416306, 0.959820289))
            Line((-2.630416306, 0.959820289), (-2.611916135, 1.016757962))
        make_face()
        with BuildLine():
            ThreePointArc((-2.514183356, -1.445296528), (-2.460456667, -1.534976543), (-2.403532537, -1.622661808))
            Line((-2.403532537, -1.622661808), (-2.322630838, -1.563883283))
            Line((-2.322630838, -1.563883283), (-2.357820254, -1.515449206))
            Line((-2.357820254, -1.515449206), (-2.514183356, -1.445296528))
        make_face()
        with BuildLine():
            Line((-2.692219705, 0.769608986), (-2.787325356, 0.800510686))
            ThreePointArc((-2.787325356, 0.800510686), (-2.805387802, 0.734710337), (-2.821897132, 0.668503238))
            Line((-2.821897132, 0.668503238), (-2.714445348, 0.701205489))
            Line((-2.714445348, 0.701205489), (-2.692219705, 0.769608986))
        make_face()
        with BuildLine():
            ThreePointArc((-2.725521957, -0.990721989), (-2.701458308, -1.054572429), (-2.67589908, -1.117839037))
            Line((-2.67589908, -1.117839037), (-2.608190662, -1.028223787))
            Line((-2.608190662, -1.028223787), (-2.630416306, -0.959820289))
            Line((-2.630416306, -0.959820289), (-2.725521957, -0.990721989))
        make_face()
        with BuildLine():
            Line((-2.798275349, 0.159867812), (-2.883541046, 0.308530446))
            ThreePointArc((-2.883541046, 0.308530446), (-2.892787832, 0.204398034), (-2.898275349, 0.1))
            Line((-2.898275349, 0.1), (-2.798275349, 0.1))
            Line((-2.798275349, 0.1), (-2.798275349, 0.159867812))
        make_face()
        with BuildLine():
            ThreePointArc((-2.837751653, -0.597633297), (-2.814367184, -0.69952652), (-2.787325356, -0.800510686))
            Line((-2.787325356, -0.800510686), (-2.692219705, -0.769608986))
            Line((-2.692219705, -0.769608986), (-2.710719876, -0.712671314))
            Line((-2.710719876, -0.712671314), (-2.837751653, -0.597633297))
        make_face()
        with BuildLine():
            Line((-2.798275349, -0.1), (-2.898275349, -0.1))
            ThreePointArc((-2.898275349, -0.1), (-2.89512033, -0.168161453), (-2.890362517, -0.236229809))
            Line((-2.890362517, -0.236229809), (-2.798275349, -0.171923694))
            Line((-2.798275349, -0.171923694), (-2.798275349, -0.1))
        make_face()
    extrude(amount=CHAMFER1_DEPTH, mode=Mode.SUBTRACT)


solid = part.part
